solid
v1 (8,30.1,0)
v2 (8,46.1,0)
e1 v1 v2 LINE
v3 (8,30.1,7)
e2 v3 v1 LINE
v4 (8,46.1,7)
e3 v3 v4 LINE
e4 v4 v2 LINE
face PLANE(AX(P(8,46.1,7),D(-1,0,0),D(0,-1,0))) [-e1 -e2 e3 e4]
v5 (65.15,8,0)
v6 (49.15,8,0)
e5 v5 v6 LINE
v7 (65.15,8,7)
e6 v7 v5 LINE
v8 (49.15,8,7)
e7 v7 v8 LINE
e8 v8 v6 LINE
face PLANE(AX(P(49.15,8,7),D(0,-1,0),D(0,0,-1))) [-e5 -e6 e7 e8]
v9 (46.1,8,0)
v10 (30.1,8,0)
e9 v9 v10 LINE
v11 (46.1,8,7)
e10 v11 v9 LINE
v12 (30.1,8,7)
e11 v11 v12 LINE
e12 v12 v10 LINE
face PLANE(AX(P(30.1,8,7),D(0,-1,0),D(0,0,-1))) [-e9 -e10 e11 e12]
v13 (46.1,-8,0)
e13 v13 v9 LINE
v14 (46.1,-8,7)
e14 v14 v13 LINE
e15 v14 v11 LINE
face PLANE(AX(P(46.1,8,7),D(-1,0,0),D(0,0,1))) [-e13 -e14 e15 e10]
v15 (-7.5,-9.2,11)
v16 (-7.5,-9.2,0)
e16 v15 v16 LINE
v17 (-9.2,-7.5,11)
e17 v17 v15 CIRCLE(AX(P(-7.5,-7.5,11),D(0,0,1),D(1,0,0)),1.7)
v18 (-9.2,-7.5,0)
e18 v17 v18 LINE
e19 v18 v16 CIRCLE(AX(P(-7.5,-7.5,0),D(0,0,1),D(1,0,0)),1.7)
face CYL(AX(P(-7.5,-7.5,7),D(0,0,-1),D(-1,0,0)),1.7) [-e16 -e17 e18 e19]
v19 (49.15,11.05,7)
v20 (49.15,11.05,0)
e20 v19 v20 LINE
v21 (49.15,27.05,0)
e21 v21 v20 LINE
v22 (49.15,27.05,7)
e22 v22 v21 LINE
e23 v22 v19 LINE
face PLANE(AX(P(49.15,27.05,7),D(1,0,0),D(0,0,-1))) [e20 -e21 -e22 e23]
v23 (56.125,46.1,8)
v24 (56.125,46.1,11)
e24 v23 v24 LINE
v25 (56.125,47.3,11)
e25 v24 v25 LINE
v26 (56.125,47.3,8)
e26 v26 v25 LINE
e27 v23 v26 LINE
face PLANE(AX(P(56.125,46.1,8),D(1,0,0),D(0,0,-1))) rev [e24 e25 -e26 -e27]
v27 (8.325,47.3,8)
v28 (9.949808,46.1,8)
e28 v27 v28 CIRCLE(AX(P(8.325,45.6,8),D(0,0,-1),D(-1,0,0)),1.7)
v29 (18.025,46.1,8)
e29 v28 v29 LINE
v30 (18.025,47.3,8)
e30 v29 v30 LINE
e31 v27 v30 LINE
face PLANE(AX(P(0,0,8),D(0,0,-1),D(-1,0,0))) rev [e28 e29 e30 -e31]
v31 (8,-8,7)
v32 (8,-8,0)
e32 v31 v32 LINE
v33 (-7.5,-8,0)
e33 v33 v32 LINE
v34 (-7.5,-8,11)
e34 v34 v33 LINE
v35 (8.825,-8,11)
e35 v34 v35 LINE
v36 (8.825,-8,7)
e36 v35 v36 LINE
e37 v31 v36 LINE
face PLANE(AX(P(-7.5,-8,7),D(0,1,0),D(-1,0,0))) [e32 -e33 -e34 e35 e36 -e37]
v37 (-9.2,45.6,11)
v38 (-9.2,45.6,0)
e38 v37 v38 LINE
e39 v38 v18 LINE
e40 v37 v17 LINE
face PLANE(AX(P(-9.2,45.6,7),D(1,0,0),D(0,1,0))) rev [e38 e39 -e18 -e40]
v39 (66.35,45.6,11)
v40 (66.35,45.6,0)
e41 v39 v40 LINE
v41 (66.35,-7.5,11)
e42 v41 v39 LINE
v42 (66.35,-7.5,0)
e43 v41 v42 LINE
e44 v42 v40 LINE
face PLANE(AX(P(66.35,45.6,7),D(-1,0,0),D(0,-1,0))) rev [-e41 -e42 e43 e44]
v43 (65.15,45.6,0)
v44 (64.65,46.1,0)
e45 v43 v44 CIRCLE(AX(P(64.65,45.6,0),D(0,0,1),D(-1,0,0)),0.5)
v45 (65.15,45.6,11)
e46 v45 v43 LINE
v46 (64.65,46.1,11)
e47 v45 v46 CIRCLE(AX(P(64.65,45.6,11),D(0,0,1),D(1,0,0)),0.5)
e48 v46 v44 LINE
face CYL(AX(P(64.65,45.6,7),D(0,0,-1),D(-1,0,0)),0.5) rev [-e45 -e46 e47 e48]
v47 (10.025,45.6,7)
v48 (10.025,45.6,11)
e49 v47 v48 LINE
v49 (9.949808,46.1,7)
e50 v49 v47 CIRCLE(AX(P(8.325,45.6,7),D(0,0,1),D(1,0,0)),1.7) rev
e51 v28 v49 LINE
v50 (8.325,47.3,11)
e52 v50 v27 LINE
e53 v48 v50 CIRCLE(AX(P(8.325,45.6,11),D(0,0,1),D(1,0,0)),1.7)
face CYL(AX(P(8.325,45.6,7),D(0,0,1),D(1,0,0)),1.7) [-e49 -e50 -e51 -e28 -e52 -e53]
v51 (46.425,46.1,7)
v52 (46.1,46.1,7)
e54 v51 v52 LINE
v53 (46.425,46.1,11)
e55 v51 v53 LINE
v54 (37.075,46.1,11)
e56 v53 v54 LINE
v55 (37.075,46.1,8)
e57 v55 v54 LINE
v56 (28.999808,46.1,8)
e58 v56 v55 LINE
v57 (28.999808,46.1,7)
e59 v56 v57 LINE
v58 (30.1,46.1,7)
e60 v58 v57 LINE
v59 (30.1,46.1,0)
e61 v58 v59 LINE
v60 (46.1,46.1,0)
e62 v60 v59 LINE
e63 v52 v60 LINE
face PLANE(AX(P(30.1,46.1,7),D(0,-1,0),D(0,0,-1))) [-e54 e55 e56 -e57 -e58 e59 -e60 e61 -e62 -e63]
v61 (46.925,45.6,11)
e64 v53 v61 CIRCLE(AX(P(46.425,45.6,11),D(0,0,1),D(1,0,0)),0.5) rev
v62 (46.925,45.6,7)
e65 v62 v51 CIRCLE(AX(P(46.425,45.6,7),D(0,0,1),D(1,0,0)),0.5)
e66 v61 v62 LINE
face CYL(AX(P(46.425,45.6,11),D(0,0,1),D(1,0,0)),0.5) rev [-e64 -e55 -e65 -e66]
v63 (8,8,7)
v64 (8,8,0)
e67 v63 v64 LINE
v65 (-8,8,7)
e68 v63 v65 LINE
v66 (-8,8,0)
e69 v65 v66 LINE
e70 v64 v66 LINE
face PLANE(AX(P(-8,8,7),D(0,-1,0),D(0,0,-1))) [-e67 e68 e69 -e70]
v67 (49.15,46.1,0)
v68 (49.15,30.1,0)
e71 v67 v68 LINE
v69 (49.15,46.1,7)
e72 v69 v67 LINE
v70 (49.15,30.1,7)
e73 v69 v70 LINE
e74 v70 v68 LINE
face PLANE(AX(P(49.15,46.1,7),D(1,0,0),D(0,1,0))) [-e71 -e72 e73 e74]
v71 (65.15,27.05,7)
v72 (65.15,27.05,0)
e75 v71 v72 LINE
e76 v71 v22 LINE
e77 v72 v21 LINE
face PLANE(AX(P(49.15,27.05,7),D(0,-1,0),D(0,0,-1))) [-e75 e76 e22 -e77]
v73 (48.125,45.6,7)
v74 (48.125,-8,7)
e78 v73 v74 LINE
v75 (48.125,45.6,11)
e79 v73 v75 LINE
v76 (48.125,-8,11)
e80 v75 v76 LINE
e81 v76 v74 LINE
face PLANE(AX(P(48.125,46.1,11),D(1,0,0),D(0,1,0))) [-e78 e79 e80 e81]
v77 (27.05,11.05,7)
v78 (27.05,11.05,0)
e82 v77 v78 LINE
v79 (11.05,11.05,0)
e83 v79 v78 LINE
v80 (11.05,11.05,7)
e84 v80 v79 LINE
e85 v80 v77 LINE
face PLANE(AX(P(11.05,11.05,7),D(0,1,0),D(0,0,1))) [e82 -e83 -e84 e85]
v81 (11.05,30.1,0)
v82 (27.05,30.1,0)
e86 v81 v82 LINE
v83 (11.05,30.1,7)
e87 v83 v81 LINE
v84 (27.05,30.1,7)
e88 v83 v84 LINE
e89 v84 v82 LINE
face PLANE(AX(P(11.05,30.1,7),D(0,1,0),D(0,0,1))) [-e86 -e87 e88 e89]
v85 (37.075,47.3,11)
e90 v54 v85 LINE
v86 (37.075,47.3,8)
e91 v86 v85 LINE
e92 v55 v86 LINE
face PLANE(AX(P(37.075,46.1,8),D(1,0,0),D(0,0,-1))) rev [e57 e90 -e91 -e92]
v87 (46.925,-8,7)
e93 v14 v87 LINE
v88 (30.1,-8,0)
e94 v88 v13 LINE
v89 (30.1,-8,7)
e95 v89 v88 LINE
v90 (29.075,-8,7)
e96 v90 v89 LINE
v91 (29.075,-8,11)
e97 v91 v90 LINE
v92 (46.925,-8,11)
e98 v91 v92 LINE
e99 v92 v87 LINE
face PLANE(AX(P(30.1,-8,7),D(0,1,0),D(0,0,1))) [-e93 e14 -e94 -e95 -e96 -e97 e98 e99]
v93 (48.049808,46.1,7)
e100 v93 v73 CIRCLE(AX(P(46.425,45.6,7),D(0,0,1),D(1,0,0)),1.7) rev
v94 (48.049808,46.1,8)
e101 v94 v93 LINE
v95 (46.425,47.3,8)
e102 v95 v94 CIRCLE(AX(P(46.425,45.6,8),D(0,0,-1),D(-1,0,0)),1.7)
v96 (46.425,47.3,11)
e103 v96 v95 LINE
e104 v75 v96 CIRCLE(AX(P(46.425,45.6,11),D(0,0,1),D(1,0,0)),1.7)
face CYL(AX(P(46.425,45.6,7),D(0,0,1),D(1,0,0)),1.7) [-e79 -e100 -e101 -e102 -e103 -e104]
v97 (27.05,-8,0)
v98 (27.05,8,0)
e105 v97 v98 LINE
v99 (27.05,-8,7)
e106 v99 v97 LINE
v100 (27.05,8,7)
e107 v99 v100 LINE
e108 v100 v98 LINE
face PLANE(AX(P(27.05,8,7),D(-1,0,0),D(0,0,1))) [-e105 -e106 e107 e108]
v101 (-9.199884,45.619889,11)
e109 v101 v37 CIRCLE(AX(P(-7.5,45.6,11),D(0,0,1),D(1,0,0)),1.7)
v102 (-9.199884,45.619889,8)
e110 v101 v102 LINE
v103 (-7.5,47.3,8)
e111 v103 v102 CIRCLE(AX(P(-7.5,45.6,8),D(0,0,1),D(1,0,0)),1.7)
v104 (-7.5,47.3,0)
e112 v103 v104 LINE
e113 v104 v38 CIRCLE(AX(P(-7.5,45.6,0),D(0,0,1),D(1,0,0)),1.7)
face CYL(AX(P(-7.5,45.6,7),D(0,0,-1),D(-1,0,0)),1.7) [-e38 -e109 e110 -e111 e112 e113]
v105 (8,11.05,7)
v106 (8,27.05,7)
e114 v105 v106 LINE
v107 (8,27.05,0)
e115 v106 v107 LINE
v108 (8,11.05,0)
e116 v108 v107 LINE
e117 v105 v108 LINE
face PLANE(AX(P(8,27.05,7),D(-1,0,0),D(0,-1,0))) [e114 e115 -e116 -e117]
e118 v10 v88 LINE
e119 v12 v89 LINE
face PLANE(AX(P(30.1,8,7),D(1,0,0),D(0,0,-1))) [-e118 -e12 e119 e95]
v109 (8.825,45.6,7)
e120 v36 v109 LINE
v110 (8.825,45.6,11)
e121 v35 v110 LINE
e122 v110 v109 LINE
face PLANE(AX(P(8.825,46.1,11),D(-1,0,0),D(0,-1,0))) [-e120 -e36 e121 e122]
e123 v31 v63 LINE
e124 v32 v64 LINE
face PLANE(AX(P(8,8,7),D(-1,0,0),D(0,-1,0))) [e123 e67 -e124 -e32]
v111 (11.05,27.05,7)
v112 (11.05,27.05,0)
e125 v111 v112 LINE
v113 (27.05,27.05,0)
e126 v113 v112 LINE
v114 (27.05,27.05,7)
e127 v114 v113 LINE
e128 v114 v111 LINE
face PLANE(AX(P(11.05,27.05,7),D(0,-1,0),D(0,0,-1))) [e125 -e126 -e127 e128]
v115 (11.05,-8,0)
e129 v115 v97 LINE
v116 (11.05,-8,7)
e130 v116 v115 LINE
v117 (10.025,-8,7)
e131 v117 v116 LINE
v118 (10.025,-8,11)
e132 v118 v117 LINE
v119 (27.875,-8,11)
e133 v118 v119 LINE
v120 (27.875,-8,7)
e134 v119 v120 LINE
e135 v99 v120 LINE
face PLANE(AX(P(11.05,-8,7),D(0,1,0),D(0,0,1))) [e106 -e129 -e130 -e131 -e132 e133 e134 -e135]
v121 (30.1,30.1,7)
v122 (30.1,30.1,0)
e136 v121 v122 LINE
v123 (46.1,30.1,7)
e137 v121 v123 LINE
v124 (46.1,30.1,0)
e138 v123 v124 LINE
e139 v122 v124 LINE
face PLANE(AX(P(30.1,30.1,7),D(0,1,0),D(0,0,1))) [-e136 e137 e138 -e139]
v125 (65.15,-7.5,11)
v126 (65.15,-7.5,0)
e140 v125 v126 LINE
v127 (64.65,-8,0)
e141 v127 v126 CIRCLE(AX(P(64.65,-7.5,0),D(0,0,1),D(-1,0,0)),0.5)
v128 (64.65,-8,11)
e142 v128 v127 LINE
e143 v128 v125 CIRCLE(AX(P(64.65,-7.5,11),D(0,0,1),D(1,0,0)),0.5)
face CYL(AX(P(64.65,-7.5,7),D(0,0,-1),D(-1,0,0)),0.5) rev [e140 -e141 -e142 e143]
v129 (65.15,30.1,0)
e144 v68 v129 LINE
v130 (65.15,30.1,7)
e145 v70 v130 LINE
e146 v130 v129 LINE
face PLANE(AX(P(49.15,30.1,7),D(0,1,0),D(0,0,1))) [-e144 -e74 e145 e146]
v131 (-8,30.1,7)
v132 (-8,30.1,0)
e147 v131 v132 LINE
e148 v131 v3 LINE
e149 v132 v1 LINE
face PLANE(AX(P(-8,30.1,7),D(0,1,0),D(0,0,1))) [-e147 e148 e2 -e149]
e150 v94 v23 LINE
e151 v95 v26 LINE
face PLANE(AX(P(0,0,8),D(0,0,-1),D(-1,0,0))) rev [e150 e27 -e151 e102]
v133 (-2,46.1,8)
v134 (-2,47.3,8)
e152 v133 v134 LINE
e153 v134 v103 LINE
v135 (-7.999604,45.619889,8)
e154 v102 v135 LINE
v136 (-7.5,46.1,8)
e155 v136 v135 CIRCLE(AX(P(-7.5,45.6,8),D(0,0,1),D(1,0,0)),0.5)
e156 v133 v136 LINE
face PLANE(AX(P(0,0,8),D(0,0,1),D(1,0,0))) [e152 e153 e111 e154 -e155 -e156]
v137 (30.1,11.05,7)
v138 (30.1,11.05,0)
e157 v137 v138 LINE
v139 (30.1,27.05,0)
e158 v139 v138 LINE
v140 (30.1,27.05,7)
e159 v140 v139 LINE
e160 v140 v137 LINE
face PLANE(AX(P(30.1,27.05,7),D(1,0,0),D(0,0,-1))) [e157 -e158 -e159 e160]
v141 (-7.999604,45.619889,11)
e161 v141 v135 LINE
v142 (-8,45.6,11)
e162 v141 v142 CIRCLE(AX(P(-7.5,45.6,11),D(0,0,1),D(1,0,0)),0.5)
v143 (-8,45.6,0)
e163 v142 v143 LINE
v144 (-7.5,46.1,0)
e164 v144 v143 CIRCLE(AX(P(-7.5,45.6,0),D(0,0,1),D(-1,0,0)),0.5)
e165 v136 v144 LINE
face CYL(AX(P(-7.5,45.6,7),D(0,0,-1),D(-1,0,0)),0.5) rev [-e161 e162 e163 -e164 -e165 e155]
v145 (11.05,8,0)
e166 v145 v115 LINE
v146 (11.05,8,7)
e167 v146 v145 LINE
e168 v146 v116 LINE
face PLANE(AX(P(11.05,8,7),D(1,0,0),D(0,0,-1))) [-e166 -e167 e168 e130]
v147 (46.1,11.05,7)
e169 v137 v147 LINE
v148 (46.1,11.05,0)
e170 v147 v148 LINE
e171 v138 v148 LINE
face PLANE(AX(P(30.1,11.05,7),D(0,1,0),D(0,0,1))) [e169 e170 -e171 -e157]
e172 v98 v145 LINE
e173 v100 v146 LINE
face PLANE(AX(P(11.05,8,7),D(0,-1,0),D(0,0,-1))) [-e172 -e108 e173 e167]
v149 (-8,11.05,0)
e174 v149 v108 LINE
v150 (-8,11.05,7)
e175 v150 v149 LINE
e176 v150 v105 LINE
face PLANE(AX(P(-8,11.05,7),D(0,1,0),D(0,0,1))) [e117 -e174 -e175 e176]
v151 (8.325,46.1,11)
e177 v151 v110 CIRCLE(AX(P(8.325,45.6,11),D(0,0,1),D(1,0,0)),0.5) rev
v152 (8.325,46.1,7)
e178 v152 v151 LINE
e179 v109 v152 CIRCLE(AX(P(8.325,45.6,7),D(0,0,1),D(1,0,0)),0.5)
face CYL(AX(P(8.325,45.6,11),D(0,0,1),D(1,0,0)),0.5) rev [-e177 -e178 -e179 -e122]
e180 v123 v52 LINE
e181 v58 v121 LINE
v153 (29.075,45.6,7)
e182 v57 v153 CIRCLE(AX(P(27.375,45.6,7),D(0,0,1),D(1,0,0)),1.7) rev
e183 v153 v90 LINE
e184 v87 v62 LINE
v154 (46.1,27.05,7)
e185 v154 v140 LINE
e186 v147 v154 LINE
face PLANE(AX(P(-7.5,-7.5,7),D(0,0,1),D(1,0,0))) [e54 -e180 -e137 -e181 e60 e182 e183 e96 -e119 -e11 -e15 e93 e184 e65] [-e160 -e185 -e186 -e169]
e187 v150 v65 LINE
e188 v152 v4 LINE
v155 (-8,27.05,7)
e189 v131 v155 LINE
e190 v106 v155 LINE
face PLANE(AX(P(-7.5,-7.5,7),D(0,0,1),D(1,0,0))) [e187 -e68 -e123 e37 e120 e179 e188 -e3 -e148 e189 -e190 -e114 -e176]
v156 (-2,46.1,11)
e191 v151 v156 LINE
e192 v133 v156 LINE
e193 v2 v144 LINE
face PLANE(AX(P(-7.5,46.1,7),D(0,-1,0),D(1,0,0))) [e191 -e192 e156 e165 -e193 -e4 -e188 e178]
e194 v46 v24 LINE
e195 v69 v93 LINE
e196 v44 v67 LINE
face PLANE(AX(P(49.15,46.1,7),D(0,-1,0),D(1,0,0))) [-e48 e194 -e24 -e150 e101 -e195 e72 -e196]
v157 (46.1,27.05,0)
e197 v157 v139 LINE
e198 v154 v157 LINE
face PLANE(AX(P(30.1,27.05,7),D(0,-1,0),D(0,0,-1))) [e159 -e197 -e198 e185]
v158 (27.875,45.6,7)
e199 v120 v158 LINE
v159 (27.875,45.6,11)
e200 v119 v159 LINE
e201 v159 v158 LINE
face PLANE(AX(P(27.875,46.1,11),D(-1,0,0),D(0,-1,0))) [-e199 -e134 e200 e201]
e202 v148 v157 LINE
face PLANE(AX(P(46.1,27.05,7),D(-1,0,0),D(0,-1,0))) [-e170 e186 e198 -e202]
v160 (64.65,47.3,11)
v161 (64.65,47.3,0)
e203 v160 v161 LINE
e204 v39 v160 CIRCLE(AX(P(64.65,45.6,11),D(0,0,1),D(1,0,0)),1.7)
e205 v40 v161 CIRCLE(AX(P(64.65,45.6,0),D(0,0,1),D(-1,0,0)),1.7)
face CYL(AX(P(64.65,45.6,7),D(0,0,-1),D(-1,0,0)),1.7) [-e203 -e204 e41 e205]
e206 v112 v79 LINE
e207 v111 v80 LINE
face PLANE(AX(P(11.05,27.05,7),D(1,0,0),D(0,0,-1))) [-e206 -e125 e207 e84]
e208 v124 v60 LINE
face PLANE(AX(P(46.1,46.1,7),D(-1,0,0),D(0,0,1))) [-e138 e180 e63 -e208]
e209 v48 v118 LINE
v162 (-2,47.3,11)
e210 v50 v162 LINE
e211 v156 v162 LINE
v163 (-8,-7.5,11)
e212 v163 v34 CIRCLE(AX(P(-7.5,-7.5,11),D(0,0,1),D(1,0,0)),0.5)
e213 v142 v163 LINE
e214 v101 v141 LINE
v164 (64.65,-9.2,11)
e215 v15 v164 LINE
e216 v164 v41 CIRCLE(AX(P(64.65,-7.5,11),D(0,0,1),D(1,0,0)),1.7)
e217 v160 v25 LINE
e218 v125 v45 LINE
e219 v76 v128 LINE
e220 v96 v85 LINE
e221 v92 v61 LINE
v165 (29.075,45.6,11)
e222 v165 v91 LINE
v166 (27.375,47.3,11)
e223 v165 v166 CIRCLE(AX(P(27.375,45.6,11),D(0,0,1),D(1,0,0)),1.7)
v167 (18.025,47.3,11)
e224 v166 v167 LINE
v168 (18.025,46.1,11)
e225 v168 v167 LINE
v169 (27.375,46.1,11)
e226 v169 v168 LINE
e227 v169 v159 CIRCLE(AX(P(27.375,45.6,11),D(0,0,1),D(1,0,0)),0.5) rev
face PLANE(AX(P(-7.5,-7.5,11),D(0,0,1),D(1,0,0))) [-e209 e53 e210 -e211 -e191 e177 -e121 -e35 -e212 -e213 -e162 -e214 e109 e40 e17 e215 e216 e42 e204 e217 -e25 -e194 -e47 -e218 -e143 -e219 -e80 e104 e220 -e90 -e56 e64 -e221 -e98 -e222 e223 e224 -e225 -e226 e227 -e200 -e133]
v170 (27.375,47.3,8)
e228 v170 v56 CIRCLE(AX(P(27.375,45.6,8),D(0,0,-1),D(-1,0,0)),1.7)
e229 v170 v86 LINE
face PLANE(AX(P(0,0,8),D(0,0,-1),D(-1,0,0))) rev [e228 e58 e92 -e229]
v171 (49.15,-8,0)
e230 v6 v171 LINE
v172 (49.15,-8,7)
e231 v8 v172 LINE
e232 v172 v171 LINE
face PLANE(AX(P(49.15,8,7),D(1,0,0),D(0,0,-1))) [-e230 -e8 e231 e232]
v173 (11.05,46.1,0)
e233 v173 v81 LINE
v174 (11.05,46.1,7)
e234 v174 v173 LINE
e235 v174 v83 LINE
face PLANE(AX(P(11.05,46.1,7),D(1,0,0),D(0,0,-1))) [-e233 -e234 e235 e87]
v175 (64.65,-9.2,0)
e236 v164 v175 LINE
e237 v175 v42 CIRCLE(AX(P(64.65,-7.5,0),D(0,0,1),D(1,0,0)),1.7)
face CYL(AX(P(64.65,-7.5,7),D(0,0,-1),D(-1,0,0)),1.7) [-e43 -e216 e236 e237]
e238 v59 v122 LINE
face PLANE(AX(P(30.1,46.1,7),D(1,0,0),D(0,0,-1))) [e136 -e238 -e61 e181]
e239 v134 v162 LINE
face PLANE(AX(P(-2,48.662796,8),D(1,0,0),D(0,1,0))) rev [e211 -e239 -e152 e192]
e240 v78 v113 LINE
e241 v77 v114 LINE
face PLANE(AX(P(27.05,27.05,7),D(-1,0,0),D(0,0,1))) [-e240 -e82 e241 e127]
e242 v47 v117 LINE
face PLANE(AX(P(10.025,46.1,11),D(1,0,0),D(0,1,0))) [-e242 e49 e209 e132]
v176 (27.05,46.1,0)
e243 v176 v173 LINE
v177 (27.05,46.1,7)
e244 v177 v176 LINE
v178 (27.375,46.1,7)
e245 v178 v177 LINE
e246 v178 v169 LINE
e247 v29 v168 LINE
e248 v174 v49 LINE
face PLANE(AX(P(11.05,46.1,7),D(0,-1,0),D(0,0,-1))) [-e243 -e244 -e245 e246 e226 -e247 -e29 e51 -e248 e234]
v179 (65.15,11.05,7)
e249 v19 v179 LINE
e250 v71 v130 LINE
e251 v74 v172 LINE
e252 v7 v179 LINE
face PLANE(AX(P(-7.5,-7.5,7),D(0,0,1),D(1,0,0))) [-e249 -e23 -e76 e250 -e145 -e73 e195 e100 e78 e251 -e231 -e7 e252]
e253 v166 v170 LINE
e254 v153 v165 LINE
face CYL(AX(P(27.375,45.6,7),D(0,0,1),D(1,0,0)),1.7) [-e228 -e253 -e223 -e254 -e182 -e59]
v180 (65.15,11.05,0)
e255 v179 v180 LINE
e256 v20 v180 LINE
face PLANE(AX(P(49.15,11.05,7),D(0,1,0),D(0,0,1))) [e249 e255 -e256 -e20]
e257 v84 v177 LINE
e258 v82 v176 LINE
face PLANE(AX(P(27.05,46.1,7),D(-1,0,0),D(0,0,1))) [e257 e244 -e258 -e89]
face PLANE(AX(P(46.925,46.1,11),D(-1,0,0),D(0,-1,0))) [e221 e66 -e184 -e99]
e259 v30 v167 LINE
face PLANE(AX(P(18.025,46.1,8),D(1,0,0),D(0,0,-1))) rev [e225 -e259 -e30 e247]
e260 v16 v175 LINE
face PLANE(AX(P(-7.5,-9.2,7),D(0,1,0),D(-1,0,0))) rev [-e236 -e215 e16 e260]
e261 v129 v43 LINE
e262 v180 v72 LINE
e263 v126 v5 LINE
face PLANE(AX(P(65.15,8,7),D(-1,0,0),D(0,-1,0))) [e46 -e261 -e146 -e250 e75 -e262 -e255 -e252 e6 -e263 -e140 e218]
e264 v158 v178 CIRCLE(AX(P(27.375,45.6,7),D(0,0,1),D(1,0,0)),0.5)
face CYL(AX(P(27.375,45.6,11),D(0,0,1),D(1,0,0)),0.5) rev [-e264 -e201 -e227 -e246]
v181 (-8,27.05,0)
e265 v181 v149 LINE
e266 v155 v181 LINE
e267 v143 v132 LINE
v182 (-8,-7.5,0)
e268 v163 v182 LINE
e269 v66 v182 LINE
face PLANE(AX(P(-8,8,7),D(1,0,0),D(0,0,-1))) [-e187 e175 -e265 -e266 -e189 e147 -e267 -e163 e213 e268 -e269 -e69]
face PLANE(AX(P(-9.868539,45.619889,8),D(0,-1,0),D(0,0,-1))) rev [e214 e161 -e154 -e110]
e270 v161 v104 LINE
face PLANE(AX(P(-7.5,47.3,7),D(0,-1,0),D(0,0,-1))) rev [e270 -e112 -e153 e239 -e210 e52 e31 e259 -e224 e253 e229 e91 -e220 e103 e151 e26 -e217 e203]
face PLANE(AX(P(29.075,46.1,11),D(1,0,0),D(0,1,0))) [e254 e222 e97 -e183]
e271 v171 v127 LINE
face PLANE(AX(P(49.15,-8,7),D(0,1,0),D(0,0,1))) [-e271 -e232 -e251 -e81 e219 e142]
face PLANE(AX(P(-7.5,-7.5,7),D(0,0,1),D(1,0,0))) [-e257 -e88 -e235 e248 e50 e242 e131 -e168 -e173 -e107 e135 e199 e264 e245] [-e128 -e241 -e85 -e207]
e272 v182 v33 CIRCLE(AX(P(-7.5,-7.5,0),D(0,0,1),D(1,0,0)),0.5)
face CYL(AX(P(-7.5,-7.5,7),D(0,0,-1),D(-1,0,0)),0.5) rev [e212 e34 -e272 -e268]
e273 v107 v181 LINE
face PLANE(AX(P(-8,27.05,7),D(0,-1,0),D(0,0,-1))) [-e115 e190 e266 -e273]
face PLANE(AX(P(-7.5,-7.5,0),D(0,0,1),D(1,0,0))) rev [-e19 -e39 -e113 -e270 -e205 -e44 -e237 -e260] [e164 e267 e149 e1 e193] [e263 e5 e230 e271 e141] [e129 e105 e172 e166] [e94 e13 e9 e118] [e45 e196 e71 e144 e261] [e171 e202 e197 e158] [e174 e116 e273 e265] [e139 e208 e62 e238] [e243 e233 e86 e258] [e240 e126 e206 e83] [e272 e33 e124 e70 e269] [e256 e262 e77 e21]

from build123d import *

# Parameters (mm, degrees)
SKICA1_W                 = 16
SKICA1_H                 = 16
P_IDAT_VYSUNUT_M1_DEPTH  = 7
SKICA2_W                 = 17.85
SKICA2_H                 = 54.1
P_IDAT_VYSUNUT_M2_DEPTH  = 4
SKICA3_W                 = 7.868538626
SKICA3_H                 = 3.04290642
SKICA3_W_2               = 8
SKICA3_H_2               = 2.219116854
SKICA3_H_3               = 2.772139553
SKICA3_H_4               = 2.562795671
ODEBRAT_VYSUNUT_M1_DEPTH = 3
ZAOBLIT1_R               = 0.5
ZAOBLIT2_R               = 1.7


with BuildPart() as part:
    # Skica1 → Přidat vysunutím1 (new body)
    with BuildSketch(Plane.XY):
        with BuildLine():
            Line((-7.5, 47.3), (64.65, 47.3))
            ThreePointArc((64.65, 47.3), (65.852081528, 46.802081528), (66.35, 45.6))
            Line((66.35, 45.6), (66.35, -7.5))
            ThreePointArc((66.35, -7.5), (65.852081528, -8.702081528), (64.65, -9.2))
            Line((64.65, -9.2), (-7.5, -9.2))
            ThreePointArc((-7.5, -9.2), (-8.702081528, -8.702081528), (-9.2, -7.5))
            Line((-9.2, -7.5), (-9.2, 45.6))
            ThreePointArc((-9.2, 45.6), (-8.702081528, 46.802081528), (-7.5, 47.3))
        make_face()
        with Locations((19.05, 0)):
            Rectangle(SKICA1_W, SKICA1_H, mode=Mode.SUBTRACT)
        with BuildLine():
            Line((-8, 8), (8, 8))
            Line((8, 8), (8, -8))
            Line((8, -8), (-7.5, -8))
            ThreePointArc((-7.5, -8), (-7.853553391, -7.853553391), (-8, -7.5))
            Line((-8, -7.5), (-8, 8))
        make_face(mode=Mode.SUBTRACT)
        with Locations((38.1, 0)):
            Rectangle(SKICA1_W, SKICA1_H, mode=Mode.SUBTRACT)
        with BuildLine():
            Line((49.15, 8), (49.15, -8))
            Line((49.15, -8), (64.65, -8))
            ThreePointArc((64.65, -8), (65.003553391, -7.853553391), (65.15, -7.5))
            Line((65.15, -7.5), (65.15, 8))
            Line((65.15, 8), (49.15, 8))
        make_face(mode=Mode.SUBTRACT)
        with Locations((19.05, 19.05)):
            Rectangle(SKICA1_W, SKICA1_H, mode=Mode.SUBTRACT)
        with Locations((38.1, 19.05)):
            Rectangle(SKICA1_W, SKICA1_H, mode=Mode.SUBTRACT)
        with Locations((57.15, 19.05)):
            Rectangle(SKICA1_W, SKICA1_H, mode=Mode.SUBTRACT)
        with Locations((19.05, 38.1)):
            Rectangle(SKICA1_W, SKICA1_H, mode=Mode.SUBTRACT)
        with Locations((38.1, 38.1)):
            Rectangle(SKICA1_W, SKICA1_H, mode=Mode.SUBTRACT)
        with BuildLine():
            Line((49.15, 46.1), (49.15, 30.1))
            Line((49.15, 30.1), (65.15, 30.1))
            Line((65.15, 30.1), (65.15, 45.6))
            ThreePointArc((65.15, 45.6), (65.003553391, 45.953553391), (64.65, 46.1))
            Line((64.65, 46.1), (49.15, 46.1))
        make_face(mode=Mode.SUBTRACT)
        with Locations((0, 19.05)):
            Rectangle(SKICA1_W, SKICA1_H, mode=Mode.SUBTRACT)
        with BuildLine():
            Line((-8, 45.6), (-8, 30.1))
            Line((-8, 30.1), (8, 30.1))
            Line((8, 30.1), (8, 46.1))
            Line((8, 46.1), (-7.5, 46.1))
            ThreePointArc((-7.5, 46.1), (-7.853553391, 45.953553391), (-8, 45.6))
        make_face(mode=Mode.SUBTRACT)
    extrude(amount=P_IDAT_VYSUNUT_M1_DEPTH)

    # Skica2 → Přidat vysunutím2 (add)
    with BuildSketch(Plane.XY.offset(7)):
        with BuildLine():
            Line((-7.5, -9.2), (64.65, -9.2))
            ThreePointArc((64.65, -9.2), (65.852081528, -8.702081528), (66.35, -7.5))
            Line((66.35, -7.5), (66.35, 45.6))
            ThreePointArc((66.35, 45.6), (65.852081528, 46.802081528), (64.65, 47.3))
            Line((64.65, 47.3), (-7.5, 47.3))
            ThreePointArc((-7.5, 47.3), (-8.702081528, 46.802081528), (-9.2, 45.6))
            Line((-9.2, 45.6), (-9.2, -7.5))
            ThreePointArc((-9.2, -7.5), (-8.702081528, -8.702081528), (-7.5, -9.2))
        make_face()
        with BuildLine():
            Line((64.65, 46.1), (48.125, 46.1))
            Line((48.125, 46.1), (48.125, -8))
            Line((48.125, -8), (64.65, -8))
            ThreePointArc((64.65, -8), (65.003553391, -7.853553391), (65.15, -7.5))
            Line((65.15, -7.5), (65.15, 45.6))
            ThreePointArc((65.15, 45.6), (65.003553391, 45.953553391), (64.65, 46.1))
        make_face(mode=Mode.SUBTRACT)
        with BuildLine():
            Line((-8, 45.6), (-8, -7.5))
            ThreePointArc((-8, -7.5), (-7.853553391, -7.853553391), (-7.5, -8))
            Line((-7.5, -8), (8.825, -8))
            Line((8.825, -8), (8.825, 46.1))
            Line((8.825, 46.1), (-7.5, 46.1))
            ThreePointArc((-7.5, 46.1), (-7.853553391, 45.953553391), (-8, 45.6))
        make_face(mode=Mode.SUBTRACT)
        with Locations((18.95, 19.05)):
            Rectangle(SKICA2_W, SKICA2_H, mode=Mode.SUBTRACT)
        with Locations((38, 19.05)):
            Rectangle(SKICA2_W, SKICA2_H, mode=Mode.SUBTRACT)
    extrude(amount=P_IDAT_VYSUNUT_M2_DEPTH)

    # Skica3 → Odebrat vysunutím1 (cut)
    with BuildSketch(Plane.XY.offset(11)):
        with Locations((-5.934269313, 47.141342461)):
            Rectangle(SKICA3_W, SKICA3_H)
        with Locations((14.025, 47.209558427)):
            Rectangle(SKICA3_W_2, SKICA3_H_2)
        with Locations((33.075, 47.486069777)):
            Rectangle(SKICA3_W_2, SKICA3_H_3)
        with Locations((52.125, 47.381397836)):
            Rectangle(SKICA3_W_2, SKICA3_H_4)
    extrude(amount=-ODEBRAT_VYSUNUT_M1_DEPTH, mode=Mode.SUBTRACT)

    # Zaoblit1
    zaoblit1_edges = [part.edges().sort_by_distance(p)[0] for p in [
        (8.825, 46.1, 9),
        (27.875, 46.1, 9),
        (46.925, 46.1, 9),
    ]]
    fillet(zaoblit1_edges, radius=ZAOBLIT1_R)

    # Zaoblit2
    # the kernel refuses this fillet: 1.7 mm, written as the material it takes off along each edge
    with BuildSketch(Plane(origin=(48.125, 47.3, 3.75), x_dir=(-1, 0, 0), z_dir=(0, 0, 1))) as zaoblit2_piece_1_section:
        with BuildLine():
            CenterArc((ZAOBLIT2_R, ZAOBLIT2_R), ZAOBLIT2_R, 180, 90)
            Line((0, ZAOBLIT2_R), (0, 0))
            Line((0, 0), (ZAOBLIT2_R, 0))
        make_face()
    zaoblit2_piece_1 = extrude(amount=11.5, mode=Mode.PRIVATE)
    zaoblit2_piece_1 = split(zaoblit2_piece_1, bisect_by=Plane(origin=(48.125338214, 45.903004102, 8), z_dir=(0, 0, -1)), keep=Keep.TOP, mode=Mode.PRIVATE)
    zaoblit2_piece_1 = split(zaoblit2_piece_1, bisect_by=Plane(origin=(48.125338214, 46.1, 7.5), z_dir=(0, -1, 0)), keep=Keep.TOP, mode=Mode.PRIVATE)
    zaoblit2_piece_1 = split(zaoblit2_piece_1, bisect_by=Plane(origin=(48.125338214, 45.903004102, 7), z_dir=(0, 0, 1)), keep=Keep.TOP, mode=Mode.PRIVATE)
    add(zaoblit2_piece_1, mode=Mode.SUBTRACT)
    with BuildSketch(Plane(origin=(48.125, 47.3, 8), x_dir=(-1, 0, 0), z_dir=(0, 0, 1))) as zaoblit2_piece_2_section:
        with BuildLine():
            CenterArc((ZAOBLIT2_R, ZAOBLIT2_R), ZAOBLIT2_R, 180, 90)
            Line((0, ZAOBLIT2_R), (0, 0))
            Line((0, 0), (ZAOBLIT2_R, 0))
        make_face()
    zaoblit2_piece_2 = extrude(amount=7.25, mode=Mode.PRIVATE)
    zaoblit2_piece_2 = split(zaoblit2_piece_2, bisect_by=Plane(origin=(47.724111446, 46.1, 11.625), z_dir=(0, 1, 0)), keep=Keep.TOP, mode=Mode.PRIVATE)
    add(zaoblit2_piece_2, mode=Mode.SUBTRACT)
    with BuildSketch(Plane(origin=(48.125, 47.3, 8), x_dir=(-1, 0, 0), z_dir=(0, 0, 1))) as zaoblit2_piece_3_section:
        with BuildLine():
            CenterArc((ZAOBLIT2_R, ZAOBLIT2_R), ZAOBLIT2_R, 180, 90)
            Line((0, ZAOBLIT2_R), (0, 0))
            Line((0, 0), (ZAOBLIT2_R, 0))
        make_face()
    zaoblit2_piece_3 = extrude(amount=7.25, mode=Mode.PRIVATE)
    zaoblit2_piece_3 = split(zaoblit2_piece_3, bisect_by=Plane(origin=(48.125338214, 46.1, 11.625), z_dir=(0, -1, 0)), keep=Keep.TOP, mode=Mode.PRIVATE)
    add(zaoblit2_piece_3, mode=Mode.SUBTRACT)
    with BuildSketch(Plane(origin=(29.075, 47.3, 3.75), x_dir=(-1, 0, 0), z_dir=(0, 0, 1))) as zaoblit2_piece_4_section:
        with BuildLine():
            CenterArc((ZAOBLIT2_R, ZAOBLIT2_R), ZAOBLIT2_R, 180, 90)
            Line((0, ZAOBLIT2_R), (0, 0))
            Line((0, 0), (ZAOBLIT2_R, 0))
        make_face()
    zaoblit2_piece_4 = extrude(amount=11.5, mode=Mode.PRIVATE)
    zaoblit2_piece_4 = split(zaoblit2_piece_4, bisect_by=Plane(origin=(29.075338214, 46.1, 7.5), z_dir=(0, -1, 0)), keep=Keep.TOP, mode=Mode.PRIVATE)
    zaoblit2_piece_4 = split(zaoblit2_piece_4, bisect_by=Plane(origin=(29.075338214, 45.903004102, 8), z_dir=(0, 0, -1)), keep=Keep.TOP, mode=Mode.PRIVATE)
    zaoblit2_piece_4 = split(zaoblit2_piece_4, bisect_by=Plane(origin=(29.075338214, 45.903004102, 7), z_dir=(0, 0, 1)), keep=Keep.TOP, mode=Mode.PRIVATE)
    add(zaoblit2_piece_4, mode=Mode.SUBTRACT)
    with BuildSketch(Plane(origin=(29.075, 47.3, 8), x_dir=(-1, 0, 0), z_dir=(0, 0, 1))) as zaoblit2_piece_5_section:
        with BuildLine():
            CenterArc((ZAOBLIT2_R, ZAOBLIT2_R), ZAOBLIT2_R, 180, 90)
            Line((0, ZAOBLIT2_R), (0, 0))
            Line((0, 0), (ZAOBLIT2_R, 0))
        make_face()
    zaoblit2_piece_5 = extrude(amount=7.25, mode=Mode.PRIVATE)
    zaoblit2_piece_5 = split(zaoblit2_piece_5, bisect_by=Plane(origin=(28.674111446, 46.1, 11.625), z_dir=(0, 1, 0)), keep=Keep.TOP, mode=Mode.PRIVATE)
    add(zaoblit2_piece_5, mode=Mode.SUBTRACT)
    with BuildSketch(Plane(origin=(29.075, 47.3, 8), x_dir=(-1, 0, 0), z_dir=(0, 0, 1))) as zaoblit2_piece_6_section:
        with BuildLine():
            CenterArc((ZAOBLIT2_R, ZAOBLIT2_R), ZAOBLIT2_R, 180, 90)
            Line((0, ZAOBLIT2_R), (0, 0))
            Line((0, 0), (ZAOBLIT2_R, 0))
        make_face()
    zaoblit2_piece_6 = extrude(amount=7.25, mode=Mode.PRIVATE)
    zaoblit2_piece_6 = split(zaoblit2_piece_6, bisect_by=Plane(origin=(29.075338214, 46.1, 11.625), z_dir=(0, -1, 0)), keep=Keep.TOP, mode=Mode.PRIVATE)
    add(zaoblit2_piece_6, mode=Mode.SUBTRACT)
    with BuildSketch(Plane(origin=(10.025, 47.3, 3.75), x_dir=(-1, 0, 0), z_dir=(0, 0, 1))) as zaoblit2_piece_7_section:
        with BuildLine():
            CenterArc((ZAOBLIT2_R, ZAOBLIT2_R), ZAOBLIT2_R, 180, 90)
            Line((0, ZAOBLIT2_R), (0, 0))
            Line((0, 0), (ZAOBLIT2_R, 0))
        make_face()
    zaoblit2_piece_7 = extrude(amount=11.5, mode=Mode.PRIVATE)
    zaoblit2_piece_7 = split(zaoblit2_piece_7, bisect_by=Plane(origin=(10.025338214, 46.1, 7.5), z_dir=(0, -1, 0)), keep=Keep.TOP, mode=Mode.PRIVATE)
    zaoblit2_piece_7 = split(zaoblit2_piece_7, bisect_by=Plane(origin=(10.025338214, 45.903004102, 8), z_dir=(0, 0, -1)), keep=Keep.TOP, mode=Mode.PRIVATE)
    zaoblit2_piece_7 = split(zaoblit2_piece_7, bisect_by=Plane(origin=(10.025338214, 45.903004102, 7), z_dir=(0, 0, 1)), keep=Keep.TOP, mode=Mode.PRIVATE)
    add(zaoblit2_piece_7, mode=Mode.SUBTRACT)
    with BuildSketch(Plane(origin=(10.025, 47.3, 8), x_dir=(-1, 0, 0), z_dir=(0, 0, 1))) as zaoblit2_piece_8_section:
        with BuildLine():
            CenterArc((ZAOBLIT2_R, ZAOBLIT2_R), ZAOBLIT2_R, 180, 90)
            Line((0, ZAOBLIT2_R), (0, 0))
            Line((0, 0), (ZAOBLIT2_R, 0))
        make_face()
    zaoblit2_piece_8 = extrude(amount=7.25, mode=Mode.PRIVATE)
    zaoblit2_piece_8 = split(zaoblit2_piece_8, bisect_by=Plane(origin=(9.624111446, 46.1, 11.625), z_dir=(0, 1, 0)), keep=Keep.TOP, mode=Mode.PRIVATE)
    add(zaoblit2_piece_8, mode=Mode.SUBTRACT)
    with BuildSketch(Plane(origin=(10.025, 47.3, 8), x_dir=(-1, 0, 0), z_dir=(0, 0, 1))) as zaoblit2_piece_9_section:
        with BuildLine():
            CenterArc((ZAOBLIT2_R, ZAOBLIT2_R), ZAOBLIT2_R, 180, 90)
            Line((0, ZAOBLIT2_R), (0, 0))
            Line((0, 0), (ZAOBLIT2_R, 0))
        make_face()
    zaoblit2_piece_9 = extrude(amount=7.25, mode=Mode.PRIVATE)
    zaoblit2_piece_9 = split(zaoblit2_piece_9, bisect_by=Plane(origin=(10.025338214, 46.1, 11.625), z_dir=(0, -1, 0)), keep=Keep.TOP, mode=Mode.PRIVATE)
    add(zaoblit2_piece_9, mode=Mode.SUBTRACT)


solid = part.part
